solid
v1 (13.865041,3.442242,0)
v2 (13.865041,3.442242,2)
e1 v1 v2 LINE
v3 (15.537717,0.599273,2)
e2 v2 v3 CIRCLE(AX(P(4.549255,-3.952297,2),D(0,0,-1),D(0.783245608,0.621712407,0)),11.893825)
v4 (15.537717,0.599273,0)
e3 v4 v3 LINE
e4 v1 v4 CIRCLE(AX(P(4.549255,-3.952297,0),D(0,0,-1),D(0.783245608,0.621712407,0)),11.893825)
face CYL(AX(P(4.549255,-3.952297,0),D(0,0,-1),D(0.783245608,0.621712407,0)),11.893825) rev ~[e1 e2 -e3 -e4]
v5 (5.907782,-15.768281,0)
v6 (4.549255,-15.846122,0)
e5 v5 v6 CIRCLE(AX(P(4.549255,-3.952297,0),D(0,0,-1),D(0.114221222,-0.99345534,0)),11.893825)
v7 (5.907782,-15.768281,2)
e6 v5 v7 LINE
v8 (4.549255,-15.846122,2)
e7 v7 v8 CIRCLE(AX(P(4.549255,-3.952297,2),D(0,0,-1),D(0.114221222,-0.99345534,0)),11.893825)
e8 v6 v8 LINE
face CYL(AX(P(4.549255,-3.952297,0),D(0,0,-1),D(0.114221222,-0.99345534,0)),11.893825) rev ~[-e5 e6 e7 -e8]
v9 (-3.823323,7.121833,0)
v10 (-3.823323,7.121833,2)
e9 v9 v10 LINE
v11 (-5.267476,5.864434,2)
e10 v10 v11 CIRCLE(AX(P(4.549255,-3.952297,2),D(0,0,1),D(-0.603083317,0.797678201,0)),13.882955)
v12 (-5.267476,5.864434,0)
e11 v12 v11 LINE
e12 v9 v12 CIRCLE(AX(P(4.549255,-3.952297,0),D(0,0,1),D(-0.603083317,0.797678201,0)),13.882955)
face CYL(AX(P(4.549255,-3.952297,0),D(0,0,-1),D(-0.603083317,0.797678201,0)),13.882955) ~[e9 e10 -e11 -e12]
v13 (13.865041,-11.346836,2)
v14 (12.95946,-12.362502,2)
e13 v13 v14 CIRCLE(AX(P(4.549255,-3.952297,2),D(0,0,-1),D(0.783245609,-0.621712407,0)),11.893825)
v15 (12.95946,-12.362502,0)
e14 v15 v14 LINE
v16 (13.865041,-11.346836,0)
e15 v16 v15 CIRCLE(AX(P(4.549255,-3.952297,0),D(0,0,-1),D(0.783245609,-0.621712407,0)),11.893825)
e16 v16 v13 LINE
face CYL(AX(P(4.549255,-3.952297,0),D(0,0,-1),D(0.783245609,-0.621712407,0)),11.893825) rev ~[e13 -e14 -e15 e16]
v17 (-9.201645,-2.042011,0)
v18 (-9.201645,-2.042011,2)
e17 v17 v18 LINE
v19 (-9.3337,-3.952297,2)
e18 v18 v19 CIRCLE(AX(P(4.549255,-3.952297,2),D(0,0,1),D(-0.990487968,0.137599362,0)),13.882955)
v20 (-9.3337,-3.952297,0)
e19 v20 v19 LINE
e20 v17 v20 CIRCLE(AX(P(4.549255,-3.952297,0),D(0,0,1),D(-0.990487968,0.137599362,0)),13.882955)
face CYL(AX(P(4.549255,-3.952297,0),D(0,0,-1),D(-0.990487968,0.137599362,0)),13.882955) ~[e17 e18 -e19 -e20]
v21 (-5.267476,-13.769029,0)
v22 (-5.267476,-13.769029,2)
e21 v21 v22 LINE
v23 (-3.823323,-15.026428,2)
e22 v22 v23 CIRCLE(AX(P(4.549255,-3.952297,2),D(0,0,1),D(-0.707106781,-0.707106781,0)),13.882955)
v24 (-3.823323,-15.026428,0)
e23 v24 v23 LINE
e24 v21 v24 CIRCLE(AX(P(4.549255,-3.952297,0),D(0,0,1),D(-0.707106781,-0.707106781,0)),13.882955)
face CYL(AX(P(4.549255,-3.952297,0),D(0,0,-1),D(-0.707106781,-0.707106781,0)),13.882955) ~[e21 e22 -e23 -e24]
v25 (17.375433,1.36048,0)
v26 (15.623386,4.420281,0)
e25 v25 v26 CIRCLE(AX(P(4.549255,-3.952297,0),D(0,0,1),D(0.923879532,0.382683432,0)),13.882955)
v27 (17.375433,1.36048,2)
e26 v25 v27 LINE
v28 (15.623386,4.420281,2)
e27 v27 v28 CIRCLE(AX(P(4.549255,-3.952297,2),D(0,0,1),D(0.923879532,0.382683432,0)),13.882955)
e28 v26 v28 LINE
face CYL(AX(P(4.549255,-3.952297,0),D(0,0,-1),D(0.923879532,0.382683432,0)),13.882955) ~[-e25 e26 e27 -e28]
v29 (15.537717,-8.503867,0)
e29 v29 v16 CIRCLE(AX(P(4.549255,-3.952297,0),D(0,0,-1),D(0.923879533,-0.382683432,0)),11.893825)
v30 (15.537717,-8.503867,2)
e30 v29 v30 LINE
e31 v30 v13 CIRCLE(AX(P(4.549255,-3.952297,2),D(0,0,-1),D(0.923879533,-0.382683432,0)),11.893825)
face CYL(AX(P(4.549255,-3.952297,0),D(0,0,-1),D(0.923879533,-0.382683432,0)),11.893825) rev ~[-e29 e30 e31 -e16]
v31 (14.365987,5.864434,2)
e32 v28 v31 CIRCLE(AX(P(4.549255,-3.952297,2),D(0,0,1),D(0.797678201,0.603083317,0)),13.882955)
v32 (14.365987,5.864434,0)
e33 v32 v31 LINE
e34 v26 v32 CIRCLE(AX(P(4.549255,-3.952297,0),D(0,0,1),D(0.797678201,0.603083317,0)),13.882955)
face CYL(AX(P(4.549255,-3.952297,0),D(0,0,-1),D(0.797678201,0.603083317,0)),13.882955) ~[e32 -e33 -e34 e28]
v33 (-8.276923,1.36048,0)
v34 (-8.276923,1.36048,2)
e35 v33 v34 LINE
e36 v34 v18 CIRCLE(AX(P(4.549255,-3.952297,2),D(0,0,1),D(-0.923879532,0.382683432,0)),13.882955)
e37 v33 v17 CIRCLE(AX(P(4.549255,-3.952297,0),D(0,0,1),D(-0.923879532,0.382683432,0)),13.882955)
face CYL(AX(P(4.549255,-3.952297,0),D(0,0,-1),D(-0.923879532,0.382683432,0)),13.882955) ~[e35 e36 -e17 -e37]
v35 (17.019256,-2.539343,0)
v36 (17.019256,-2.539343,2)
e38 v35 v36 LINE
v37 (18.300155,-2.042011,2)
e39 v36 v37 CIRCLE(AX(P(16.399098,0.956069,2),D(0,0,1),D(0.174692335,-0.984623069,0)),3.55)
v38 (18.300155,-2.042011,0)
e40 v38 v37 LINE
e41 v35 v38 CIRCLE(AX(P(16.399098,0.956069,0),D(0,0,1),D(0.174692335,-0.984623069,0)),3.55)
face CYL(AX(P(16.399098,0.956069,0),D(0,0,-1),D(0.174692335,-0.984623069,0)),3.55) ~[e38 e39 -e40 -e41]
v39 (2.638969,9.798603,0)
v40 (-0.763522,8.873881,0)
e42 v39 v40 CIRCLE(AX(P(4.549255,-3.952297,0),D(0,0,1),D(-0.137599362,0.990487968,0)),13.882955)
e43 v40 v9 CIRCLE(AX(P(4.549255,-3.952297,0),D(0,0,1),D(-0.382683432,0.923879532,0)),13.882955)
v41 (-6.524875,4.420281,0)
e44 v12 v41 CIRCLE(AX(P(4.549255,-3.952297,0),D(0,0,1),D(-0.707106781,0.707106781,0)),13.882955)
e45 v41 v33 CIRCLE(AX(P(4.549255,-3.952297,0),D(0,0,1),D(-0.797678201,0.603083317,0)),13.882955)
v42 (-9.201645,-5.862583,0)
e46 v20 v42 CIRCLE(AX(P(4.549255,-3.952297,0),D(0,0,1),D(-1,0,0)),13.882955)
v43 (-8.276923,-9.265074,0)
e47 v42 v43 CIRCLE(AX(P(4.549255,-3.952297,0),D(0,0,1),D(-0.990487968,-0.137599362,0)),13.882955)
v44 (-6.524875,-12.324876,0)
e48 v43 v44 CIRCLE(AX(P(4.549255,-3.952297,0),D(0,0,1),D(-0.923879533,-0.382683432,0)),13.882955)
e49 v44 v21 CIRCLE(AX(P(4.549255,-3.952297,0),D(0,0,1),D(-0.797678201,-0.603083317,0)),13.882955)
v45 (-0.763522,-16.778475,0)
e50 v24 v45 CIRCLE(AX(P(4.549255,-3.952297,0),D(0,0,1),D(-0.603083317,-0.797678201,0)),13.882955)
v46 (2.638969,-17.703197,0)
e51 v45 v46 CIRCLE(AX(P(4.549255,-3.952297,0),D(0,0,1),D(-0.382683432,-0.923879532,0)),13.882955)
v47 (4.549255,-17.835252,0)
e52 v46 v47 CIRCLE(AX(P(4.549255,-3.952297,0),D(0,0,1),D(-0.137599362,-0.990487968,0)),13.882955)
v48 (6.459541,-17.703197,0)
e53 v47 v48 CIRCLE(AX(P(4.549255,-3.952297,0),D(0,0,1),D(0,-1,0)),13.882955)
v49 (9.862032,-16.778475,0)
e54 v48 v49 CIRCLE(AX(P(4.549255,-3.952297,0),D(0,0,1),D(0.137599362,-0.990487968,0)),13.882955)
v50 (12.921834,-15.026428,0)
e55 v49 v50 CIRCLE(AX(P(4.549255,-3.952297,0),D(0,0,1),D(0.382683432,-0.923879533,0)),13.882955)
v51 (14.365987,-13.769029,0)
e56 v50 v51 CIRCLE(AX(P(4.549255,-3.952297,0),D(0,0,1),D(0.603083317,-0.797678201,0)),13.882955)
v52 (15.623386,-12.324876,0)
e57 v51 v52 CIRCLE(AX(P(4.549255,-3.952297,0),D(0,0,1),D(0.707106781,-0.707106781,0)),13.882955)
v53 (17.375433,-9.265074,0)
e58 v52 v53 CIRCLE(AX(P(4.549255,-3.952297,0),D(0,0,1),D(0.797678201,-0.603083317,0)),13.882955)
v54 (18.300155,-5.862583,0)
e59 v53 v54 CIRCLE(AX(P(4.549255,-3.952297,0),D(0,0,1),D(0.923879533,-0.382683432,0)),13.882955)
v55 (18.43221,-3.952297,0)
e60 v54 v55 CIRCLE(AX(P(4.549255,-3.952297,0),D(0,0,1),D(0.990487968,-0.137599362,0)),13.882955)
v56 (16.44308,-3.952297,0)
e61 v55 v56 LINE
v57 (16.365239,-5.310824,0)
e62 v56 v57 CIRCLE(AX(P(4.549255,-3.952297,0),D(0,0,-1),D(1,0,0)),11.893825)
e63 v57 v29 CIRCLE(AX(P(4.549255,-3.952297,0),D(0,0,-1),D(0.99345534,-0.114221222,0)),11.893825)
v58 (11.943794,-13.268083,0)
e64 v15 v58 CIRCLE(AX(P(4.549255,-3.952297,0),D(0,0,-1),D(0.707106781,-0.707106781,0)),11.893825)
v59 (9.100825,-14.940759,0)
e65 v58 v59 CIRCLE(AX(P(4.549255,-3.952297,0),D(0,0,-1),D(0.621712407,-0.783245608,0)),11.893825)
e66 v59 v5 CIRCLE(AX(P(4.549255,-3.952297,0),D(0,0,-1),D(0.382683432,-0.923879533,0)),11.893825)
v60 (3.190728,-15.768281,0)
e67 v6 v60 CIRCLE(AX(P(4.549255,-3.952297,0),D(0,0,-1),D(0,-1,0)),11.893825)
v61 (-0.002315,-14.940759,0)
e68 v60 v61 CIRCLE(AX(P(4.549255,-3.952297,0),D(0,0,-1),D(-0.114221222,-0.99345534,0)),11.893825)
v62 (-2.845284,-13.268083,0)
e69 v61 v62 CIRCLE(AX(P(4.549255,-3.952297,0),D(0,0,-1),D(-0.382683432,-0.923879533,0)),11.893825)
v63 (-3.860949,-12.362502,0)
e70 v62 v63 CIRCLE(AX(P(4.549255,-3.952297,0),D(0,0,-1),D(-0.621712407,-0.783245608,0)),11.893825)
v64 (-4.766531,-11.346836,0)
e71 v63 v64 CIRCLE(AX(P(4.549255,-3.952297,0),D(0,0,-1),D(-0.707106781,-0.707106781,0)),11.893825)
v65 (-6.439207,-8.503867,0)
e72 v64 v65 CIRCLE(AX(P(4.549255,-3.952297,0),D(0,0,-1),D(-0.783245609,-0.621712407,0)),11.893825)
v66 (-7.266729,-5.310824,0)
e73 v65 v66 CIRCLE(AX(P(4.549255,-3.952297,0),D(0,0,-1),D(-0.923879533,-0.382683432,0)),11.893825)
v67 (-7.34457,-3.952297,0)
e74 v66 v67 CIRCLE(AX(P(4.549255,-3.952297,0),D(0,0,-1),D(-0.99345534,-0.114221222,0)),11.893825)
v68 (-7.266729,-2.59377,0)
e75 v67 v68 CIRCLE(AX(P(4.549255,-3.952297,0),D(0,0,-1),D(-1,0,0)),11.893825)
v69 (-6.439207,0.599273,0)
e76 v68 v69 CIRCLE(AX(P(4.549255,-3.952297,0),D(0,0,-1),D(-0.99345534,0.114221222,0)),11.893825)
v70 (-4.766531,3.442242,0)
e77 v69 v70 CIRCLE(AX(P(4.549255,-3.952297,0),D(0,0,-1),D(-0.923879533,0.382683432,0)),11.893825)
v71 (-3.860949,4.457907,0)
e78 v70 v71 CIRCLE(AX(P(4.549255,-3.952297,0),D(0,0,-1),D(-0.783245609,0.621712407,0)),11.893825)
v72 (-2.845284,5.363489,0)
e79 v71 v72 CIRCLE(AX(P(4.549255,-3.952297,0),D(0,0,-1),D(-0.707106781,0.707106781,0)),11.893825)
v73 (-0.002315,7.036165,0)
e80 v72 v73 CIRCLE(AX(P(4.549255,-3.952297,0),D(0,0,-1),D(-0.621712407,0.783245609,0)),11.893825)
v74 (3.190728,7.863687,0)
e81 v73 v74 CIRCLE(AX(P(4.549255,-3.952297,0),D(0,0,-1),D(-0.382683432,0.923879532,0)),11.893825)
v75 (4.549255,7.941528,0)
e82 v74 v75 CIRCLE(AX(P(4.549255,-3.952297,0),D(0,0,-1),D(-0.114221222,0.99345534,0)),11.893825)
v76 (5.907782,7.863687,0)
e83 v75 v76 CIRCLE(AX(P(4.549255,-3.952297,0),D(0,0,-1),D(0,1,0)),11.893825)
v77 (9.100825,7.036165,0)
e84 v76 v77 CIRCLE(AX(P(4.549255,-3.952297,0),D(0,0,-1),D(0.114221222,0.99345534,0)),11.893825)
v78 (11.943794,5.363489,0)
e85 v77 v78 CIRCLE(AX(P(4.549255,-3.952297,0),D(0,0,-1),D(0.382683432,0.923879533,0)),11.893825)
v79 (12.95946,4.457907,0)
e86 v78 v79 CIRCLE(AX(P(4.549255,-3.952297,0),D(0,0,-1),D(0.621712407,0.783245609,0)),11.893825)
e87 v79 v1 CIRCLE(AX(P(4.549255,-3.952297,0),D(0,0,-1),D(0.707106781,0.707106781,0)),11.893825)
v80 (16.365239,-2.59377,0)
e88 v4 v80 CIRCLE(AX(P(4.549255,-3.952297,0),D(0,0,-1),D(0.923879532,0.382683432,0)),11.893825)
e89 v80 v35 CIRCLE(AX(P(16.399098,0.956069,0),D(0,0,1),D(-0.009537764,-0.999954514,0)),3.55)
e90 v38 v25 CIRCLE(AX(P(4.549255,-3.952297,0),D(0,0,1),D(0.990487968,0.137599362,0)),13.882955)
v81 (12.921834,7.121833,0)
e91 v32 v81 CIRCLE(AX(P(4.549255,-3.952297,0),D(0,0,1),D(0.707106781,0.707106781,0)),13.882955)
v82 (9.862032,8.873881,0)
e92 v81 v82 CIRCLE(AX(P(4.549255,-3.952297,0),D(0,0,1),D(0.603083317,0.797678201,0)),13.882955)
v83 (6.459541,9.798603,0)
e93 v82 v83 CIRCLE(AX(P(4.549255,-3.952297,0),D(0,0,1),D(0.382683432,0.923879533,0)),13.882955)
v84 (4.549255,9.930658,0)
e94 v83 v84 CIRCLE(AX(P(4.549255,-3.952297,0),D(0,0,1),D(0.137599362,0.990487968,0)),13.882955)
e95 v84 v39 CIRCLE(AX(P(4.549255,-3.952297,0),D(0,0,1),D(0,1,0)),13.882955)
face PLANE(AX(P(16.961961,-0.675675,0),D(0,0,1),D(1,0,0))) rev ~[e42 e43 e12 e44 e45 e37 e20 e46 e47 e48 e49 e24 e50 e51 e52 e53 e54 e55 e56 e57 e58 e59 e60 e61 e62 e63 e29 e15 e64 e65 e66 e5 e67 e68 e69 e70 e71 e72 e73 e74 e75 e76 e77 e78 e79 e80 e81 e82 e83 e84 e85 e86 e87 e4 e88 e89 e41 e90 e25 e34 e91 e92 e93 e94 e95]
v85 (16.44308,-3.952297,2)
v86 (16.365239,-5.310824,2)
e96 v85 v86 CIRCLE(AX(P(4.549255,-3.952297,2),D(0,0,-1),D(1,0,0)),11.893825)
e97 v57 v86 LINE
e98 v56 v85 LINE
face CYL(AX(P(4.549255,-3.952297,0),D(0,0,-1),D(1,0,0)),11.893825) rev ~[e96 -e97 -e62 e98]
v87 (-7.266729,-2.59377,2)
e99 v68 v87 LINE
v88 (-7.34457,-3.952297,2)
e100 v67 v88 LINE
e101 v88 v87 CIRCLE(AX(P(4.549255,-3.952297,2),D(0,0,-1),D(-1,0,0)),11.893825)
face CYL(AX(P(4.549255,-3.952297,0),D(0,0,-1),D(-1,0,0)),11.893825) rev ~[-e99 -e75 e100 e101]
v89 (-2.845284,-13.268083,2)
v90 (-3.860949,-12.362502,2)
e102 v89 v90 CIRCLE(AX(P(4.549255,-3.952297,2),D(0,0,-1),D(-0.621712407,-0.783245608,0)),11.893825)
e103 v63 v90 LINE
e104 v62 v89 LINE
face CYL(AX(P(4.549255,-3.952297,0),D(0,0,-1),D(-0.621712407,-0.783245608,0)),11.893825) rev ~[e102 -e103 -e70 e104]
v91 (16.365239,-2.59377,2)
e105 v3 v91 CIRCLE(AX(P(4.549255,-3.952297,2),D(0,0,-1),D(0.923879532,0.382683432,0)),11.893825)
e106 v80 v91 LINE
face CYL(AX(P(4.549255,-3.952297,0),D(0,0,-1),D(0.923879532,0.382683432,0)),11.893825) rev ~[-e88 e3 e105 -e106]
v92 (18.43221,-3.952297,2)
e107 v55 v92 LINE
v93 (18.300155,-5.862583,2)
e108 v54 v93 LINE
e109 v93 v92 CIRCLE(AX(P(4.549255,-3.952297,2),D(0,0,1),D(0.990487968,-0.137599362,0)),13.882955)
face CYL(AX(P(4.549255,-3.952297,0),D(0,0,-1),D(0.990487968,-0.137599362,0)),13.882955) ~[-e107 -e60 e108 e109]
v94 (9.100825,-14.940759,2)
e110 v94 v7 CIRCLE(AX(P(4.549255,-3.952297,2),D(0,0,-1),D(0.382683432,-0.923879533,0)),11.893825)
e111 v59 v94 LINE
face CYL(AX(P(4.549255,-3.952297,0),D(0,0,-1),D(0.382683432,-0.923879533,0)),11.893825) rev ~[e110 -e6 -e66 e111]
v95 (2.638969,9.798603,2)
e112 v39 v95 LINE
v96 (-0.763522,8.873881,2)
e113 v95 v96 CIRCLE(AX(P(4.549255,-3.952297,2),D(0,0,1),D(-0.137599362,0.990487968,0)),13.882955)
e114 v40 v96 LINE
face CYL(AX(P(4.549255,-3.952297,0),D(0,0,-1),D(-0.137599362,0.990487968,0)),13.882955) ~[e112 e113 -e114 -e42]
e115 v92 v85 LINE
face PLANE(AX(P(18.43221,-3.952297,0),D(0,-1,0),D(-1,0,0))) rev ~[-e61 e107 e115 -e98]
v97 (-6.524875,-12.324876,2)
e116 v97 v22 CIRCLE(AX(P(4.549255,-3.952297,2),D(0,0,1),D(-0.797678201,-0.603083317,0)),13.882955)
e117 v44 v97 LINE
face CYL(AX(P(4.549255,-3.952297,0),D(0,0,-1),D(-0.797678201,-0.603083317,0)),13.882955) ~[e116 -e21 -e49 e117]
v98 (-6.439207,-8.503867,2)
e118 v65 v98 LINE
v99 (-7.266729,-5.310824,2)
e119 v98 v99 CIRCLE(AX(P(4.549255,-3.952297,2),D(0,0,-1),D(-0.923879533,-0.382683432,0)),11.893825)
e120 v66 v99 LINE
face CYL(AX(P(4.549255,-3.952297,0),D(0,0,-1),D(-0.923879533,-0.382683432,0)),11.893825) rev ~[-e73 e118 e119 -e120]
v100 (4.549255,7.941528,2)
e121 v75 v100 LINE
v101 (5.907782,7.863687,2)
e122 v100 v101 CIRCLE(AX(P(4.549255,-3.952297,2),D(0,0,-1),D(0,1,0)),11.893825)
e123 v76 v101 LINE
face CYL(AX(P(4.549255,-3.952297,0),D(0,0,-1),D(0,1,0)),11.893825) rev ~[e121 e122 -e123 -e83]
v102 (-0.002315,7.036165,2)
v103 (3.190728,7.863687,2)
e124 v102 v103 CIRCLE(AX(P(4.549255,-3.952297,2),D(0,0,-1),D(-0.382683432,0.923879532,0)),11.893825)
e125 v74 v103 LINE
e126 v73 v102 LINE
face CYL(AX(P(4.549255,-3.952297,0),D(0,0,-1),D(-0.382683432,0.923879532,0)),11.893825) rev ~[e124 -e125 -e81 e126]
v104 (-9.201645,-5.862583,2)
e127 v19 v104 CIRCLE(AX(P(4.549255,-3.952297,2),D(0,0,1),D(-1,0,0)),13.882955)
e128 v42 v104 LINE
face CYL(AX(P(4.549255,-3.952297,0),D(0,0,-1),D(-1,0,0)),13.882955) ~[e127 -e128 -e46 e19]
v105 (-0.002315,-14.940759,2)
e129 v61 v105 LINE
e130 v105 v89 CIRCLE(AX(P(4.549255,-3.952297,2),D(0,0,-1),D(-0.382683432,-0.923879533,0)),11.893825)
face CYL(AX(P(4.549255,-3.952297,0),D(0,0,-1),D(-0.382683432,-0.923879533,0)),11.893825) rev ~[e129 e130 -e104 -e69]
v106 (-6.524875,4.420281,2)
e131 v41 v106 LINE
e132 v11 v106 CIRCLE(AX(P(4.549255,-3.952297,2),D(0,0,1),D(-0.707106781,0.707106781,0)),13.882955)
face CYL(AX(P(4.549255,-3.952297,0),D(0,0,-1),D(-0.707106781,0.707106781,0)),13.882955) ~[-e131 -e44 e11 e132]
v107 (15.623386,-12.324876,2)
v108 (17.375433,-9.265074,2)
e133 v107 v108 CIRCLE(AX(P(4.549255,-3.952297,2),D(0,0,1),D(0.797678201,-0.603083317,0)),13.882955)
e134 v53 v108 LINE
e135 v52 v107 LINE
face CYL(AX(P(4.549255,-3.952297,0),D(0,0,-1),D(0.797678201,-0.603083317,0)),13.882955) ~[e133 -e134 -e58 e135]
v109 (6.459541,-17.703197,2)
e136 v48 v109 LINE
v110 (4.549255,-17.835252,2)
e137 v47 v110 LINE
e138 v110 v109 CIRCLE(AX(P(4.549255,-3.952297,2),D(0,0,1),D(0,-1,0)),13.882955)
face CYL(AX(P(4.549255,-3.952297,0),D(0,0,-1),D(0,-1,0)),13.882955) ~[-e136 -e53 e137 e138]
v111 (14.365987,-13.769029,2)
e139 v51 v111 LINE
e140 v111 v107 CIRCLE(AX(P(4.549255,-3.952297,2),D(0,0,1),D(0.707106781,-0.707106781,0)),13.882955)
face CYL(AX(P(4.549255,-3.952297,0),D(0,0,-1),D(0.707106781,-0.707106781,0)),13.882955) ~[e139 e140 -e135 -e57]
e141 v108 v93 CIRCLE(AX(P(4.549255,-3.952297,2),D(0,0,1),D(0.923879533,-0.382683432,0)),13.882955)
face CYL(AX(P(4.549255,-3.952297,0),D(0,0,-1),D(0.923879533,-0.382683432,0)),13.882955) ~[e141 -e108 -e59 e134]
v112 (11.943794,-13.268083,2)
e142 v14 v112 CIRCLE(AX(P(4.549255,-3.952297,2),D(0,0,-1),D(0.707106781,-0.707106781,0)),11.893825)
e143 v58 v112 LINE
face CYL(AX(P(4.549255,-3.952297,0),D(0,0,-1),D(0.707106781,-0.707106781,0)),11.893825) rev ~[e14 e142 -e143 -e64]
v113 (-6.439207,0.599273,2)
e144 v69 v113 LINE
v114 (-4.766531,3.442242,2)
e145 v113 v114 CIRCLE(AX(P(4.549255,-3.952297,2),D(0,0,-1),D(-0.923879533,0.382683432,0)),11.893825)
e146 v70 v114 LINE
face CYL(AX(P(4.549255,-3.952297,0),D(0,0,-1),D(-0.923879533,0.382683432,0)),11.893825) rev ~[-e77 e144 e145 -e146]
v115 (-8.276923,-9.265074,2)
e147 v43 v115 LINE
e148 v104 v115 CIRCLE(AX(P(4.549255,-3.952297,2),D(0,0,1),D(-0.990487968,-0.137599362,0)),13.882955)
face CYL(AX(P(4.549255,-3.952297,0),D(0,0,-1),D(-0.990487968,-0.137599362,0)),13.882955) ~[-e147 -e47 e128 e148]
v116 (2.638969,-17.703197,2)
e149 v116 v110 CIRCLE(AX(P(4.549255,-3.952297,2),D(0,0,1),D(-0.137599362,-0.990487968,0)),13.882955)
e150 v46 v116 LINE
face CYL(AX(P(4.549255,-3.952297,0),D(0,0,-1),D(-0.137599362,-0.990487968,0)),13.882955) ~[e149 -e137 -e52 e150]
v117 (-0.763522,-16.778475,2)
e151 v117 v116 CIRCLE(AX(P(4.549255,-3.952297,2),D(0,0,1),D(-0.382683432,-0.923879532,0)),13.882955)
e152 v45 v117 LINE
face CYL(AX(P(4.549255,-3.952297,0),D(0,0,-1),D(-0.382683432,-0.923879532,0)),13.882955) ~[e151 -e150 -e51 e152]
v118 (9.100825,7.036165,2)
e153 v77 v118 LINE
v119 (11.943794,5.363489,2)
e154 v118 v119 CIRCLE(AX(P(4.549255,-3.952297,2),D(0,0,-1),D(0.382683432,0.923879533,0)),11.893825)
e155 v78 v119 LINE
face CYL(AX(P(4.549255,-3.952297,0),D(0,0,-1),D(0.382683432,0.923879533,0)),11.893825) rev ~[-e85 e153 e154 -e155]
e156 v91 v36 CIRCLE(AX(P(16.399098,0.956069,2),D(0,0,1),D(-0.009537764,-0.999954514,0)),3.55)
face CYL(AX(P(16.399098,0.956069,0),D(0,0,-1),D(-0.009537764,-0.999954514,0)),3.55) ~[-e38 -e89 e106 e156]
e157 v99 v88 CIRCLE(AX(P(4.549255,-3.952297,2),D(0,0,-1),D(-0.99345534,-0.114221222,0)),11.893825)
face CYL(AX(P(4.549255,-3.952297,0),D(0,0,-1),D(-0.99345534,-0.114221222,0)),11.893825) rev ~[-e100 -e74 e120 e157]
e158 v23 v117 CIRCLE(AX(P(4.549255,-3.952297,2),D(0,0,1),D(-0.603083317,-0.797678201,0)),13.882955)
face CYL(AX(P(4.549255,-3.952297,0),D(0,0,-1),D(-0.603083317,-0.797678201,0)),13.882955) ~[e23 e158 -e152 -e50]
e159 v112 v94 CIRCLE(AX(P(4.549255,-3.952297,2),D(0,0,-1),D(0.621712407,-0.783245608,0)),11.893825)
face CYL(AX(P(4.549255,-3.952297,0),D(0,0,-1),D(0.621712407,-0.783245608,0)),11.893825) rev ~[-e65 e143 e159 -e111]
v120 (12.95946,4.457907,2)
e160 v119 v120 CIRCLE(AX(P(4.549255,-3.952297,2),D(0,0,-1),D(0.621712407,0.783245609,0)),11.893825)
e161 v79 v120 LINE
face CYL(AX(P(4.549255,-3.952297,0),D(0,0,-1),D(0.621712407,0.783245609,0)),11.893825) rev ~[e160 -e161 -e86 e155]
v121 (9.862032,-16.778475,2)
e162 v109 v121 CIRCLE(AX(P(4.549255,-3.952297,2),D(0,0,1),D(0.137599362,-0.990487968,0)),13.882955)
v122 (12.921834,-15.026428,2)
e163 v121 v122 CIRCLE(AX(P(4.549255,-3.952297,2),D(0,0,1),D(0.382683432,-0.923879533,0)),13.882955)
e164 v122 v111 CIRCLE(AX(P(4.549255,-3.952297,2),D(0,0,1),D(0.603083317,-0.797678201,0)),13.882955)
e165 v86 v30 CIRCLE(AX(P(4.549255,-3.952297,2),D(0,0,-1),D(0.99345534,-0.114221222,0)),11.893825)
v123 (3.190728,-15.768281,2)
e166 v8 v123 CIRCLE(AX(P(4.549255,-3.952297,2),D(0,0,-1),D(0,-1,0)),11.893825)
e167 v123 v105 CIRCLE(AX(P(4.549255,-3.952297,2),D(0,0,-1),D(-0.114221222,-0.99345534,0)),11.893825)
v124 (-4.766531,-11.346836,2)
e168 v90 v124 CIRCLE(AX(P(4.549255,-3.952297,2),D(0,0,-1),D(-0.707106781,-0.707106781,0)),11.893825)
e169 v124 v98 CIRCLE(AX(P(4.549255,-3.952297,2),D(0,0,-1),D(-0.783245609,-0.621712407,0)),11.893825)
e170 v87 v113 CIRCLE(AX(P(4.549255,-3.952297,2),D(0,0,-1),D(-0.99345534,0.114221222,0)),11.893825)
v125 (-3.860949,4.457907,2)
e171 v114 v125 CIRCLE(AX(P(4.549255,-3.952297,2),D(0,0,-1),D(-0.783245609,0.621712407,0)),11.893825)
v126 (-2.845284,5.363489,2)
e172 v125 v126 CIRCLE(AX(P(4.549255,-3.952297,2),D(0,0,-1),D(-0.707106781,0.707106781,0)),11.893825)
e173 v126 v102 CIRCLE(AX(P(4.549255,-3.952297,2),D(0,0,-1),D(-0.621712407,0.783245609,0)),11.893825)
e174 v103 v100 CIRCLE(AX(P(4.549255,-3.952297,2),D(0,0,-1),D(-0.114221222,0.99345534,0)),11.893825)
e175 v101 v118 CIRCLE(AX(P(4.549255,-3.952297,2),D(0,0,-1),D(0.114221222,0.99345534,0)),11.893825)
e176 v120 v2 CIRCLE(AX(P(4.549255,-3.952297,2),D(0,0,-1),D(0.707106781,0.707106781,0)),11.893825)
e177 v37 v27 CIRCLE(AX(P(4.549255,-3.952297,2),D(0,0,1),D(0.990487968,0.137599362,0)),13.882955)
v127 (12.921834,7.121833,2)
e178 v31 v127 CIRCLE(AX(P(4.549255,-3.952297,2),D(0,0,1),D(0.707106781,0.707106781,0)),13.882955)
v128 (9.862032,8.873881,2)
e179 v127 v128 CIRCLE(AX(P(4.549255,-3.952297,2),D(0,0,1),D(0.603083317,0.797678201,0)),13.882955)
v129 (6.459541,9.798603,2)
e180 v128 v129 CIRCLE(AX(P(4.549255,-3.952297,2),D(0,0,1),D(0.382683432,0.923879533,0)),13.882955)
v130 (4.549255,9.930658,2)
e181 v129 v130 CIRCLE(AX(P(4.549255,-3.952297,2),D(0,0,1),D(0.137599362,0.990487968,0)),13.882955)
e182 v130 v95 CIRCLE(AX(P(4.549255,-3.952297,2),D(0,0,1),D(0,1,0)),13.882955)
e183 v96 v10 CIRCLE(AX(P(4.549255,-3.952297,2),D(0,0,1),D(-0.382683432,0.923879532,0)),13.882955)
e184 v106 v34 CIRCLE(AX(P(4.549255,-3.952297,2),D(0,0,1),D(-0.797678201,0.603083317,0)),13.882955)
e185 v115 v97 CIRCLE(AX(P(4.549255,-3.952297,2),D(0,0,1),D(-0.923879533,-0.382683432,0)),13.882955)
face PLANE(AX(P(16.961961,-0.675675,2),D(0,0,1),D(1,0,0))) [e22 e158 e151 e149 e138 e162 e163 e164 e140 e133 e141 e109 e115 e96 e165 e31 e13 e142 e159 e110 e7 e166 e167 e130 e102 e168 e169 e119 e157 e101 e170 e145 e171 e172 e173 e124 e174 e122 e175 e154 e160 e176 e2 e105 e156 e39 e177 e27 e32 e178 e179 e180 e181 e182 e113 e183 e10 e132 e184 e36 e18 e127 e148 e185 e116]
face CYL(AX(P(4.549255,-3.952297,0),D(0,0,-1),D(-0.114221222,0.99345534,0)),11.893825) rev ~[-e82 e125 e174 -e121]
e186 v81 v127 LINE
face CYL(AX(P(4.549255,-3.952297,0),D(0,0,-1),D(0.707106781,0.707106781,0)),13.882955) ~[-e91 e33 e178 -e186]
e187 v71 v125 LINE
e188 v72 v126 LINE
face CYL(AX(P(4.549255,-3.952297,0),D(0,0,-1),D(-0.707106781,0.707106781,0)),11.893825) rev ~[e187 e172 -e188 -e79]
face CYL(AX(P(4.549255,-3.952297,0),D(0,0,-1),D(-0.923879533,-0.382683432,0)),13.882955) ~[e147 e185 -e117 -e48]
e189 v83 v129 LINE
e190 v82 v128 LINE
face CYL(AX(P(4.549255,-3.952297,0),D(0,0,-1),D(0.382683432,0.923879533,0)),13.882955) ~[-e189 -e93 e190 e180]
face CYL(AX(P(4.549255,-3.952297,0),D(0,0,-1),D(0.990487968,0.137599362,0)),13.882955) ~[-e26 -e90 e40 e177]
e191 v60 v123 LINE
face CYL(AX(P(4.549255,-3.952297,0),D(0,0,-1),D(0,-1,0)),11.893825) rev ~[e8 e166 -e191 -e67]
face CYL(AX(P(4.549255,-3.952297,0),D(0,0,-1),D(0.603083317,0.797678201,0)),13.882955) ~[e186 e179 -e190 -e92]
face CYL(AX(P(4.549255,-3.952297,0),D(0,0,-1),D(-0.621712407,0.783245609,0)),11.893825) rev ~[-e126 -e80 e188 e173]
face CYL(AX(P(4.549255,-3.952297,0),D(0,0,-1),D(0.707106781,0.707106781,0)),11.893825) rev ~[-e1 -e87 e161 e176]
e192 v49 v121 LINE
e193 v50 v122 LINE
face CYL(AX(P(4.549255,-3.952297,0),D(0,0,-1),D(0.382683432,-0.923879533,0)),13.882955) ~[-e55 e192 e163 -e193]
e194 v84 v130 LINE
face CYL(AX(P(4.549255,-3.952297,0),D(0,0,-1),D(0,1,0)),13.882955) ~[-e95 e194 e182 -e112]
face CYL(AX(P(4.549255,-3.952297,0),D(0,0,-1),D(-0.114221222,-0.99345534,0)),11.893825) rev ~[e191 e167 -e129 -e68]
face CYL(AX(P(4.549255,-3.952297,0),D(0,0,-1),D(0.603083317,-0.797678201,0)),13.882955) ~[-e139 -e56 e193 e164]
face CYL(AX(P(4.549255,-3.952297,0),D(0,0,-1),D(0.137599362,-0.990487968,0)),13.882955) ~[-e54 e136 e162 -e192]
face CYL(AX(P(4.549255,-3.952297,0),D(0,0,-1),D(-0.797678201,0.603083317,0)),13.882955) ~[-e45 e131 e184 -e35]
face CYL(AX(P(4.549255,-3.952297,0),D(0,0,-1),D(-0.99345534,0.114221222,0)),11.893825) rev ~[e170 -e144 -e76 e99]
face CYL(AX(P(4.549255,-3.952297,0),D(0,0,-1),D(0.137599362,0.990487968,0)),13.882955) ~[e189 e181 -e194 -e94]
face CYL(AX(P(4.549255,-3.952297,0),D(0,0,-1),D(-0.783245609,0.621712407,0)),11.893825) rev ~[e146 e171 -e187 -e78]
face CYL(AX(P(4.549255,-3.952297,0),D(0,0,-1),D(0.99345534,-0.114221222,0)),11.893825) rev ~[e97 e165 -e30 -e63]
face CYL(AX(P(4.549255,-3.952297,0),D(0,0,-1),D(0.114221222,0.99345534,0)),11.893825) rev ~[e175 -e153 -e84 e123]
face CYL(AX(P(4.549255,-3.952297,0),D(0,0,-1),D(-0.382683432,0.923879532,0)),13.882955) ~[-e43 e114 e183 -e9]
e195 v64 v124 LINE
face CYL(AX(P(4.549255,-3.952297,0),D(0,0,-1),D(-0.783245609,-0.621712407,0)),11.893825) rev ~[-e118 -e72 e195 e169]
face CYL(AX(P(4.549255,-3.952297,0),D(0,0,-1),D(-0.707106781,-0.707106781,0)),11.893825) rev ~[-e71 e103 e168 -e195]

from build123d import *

# Parameters (mm, degrees)
F2_DEPTH = 2


with BuildPart() as f2:
    # F1 (on face) → F2 (new body)
    with BuildSketch(Plane.XY):
        with BuildLine():
            ThreePointArc((18.3001549066, -2.0420113713), (17.9462510765, -0.3112895728), (17.3754329945, 1.3604797241))
            Line((17.3754329945, 1.3604797241), (15.5377167825, 0.5992727453))
            ThreePointArc((15.5377167825, 0.5992727453), (16.0627067105, -0.968422059), (16.3652392751, -2.593769859))
            ThreePointArc((16.3652392751, -2.593769859), (16.6935081093, -2.5817022248), (17.0192561264, -2.5393432276))
            ThreePointArc((17.0192561264, -2.5393432276), (17.6839972454, -2.3532416527), (18.3001549066, -2.0420113713))
        make_face()
        with BuildLine():
            Line((15.5377167825, 0.5992727453), (17.3754329945, 1.3604797241))
            ThreePointArc((17.3754329945, 1.3604797241), (16.5969429247, 2.9462284671), (15.6233856027, 4.4202813853))
            ThreePointArc((15.6233856027, 4.4202813853), (14.6734726061, 4.0584412817), (13.8650414705, 3.4422415894))
            ThreePointArc((13.8650414705, 3.4422415894), (14.8004130937, 2.0790243103), (15.5377167825, 0.5992727453))
        make_face()
        with BuildLine():
            ThreePointArc((13.8650414705, 3.4422415894), (14.6734726061, 4.0584412817), (15.6233856027, 4.4202813853))
            ThreePointArc((15.6233856027, 4.4202813853), (15.0196144043, 5.16406253), (14.3659866612, 5.8644344489))
            Line((14.3659866612, 5.8644344489), (12.9594595658, 4.4579073535))
            ThreePointArc((12.9594595658, 4.4579073535), (13.4267875285, 3.9630358747), (13.8650414705, 3.4422415894))
        make_face()
        with BuildLine():
            ThreePointArc((18.3001549066, -5.8625828565), (18.399156889, -4.9097194566), (18.4322100127, -3.9522971139))
            Line((18.4322100127, -3.9522971139), (16.4430803185, -3.9522971139))
            ThreePointArc((16.4430803185, -3.9522971139), (16.4236041115, -4.6326748639), (16.3652392751, -5.3108243689))
            ThreePointArc((16.3652392751, -5.3108243689), (17.3726053942, -5.446752526), (18.3001549066, -5.8625828565))
        make_face()
        with BuildLine():
            Line((12.9594595658, 4.4579073535), (14.3659866612, 5.8644344489))
            ThreePointArc((14.3659866612, 5.8644344489), (13.6656147423, 6.518062192), (12.9218335976, 7.1218333904))
            ThreePointArc((12.9218335976, 7.1218333904), (12.559993494, 6.1719203938), (11.9437938017, 5.3634892582))
            ThreePointArc((11.9437938017, 5.3634892582), (12.464588087, 4.9252353162), (12.9594595658, 4.4579073535))
        make_face()
        with BuildLine():
            ThreePointArc((17.3754329945, -9.2650739519), (17.9462510765, -7.593304655), (18.3001549066, -5.8625828565))
            ThreePointArc((18.3001549066, -5.8625828565), (17.3726053942, -5.446752526), (16.3652392751, -5.3108243689))
            ThreePointArc((16.3652392751, -5.3108243689), (16.0627067105, -6.9361721689), (15.5377167825, -8.5038669731))
            Line((15.5377167825, -8.5038669731), (17.3754329945, -9.2650739519))
        make_face()
        with BuildLine():
            ThreePointArc((11.9437938017, 5.3634892582), (12.559993494, 6.1719203938), (12.9218335976, 7.1218333904))
            ThreePointArc((12.9218335976, 7.1218333904), (11.4477806794, 8.0953907124), (9.8620319364, 8.8738807822))
            Line((9.8620319364, 8.8738807822), (9.1008249576, 7.0361645702))
            ThreePointArc((9.1008249576, 7.0361645702), (10.5805765226, 6.2988608814), (11.9437938017, 5.3634892582))
        make_face()
        with BuildLine():
            ThreePointArc((15.6233856027, -12.3248756131), (16.5969429247, -10.8508226949), (17.3754329945, -9.2650739519))
            Line((17.3754329945, -9.2650739519), (15.5377167825, -8.5038669731))
            ThreePointArc((15.5377167825, -8.5038669731), (14.8004130937, -9.9836185381), (13.8650414705, -11.3468358173))
            ThreePointArc((13.8650414705, -11.3468358173), (14.6734726061, -11.9630355095), (15.6233856027, -12.3248756131))
        make_face()
        with BuildLine():
            Line((9.1008249576, 7.0361645702), (9.8620319364, 8.8738807822))
            ThreePointArc((9.8620319364, 8.8738807822), (8.1902626395, 9.4446988642), (6.459540841, 9.7986026942))
            ThreePointArc((6.459540841, 9.7986026942), (6.0437105105, 8.8710531819), (5.9077823533, 7.8636870628))
            ThreePointArc((5.9077823533, 7.8636870628), (7.5331301533, 7.5611544982), (9.1008249576, 7.0361645702))
        make_face()
        with BuildLine():
            ThreePointArc((14.3659866612, -13.7690286767), (15.0196144043, -13.0686567579), (15.6233856027, -12.3248756131))
            ThreePointArc((15.6233856027, -12.3248756131), (14.6734726061, -11.9630355095), (13.8650414705, -11.3468358173))
            ThreePointArc((13.8650414705, -11.3468358173), (13.4267875285, -11.8676301025), (12.9594595658, -12.3625015813))
            Line((12.9594595658, -12.3625015813), (14.3659866612, -13.7690286767))
        make_face()
        with BuildLine():
            ThreePointArc((5.9077823533, 7.8636870628), (6.0437105105, 8.8710531819), (6.459540841, 9.7986026942))
            ThreePointArc((6.459540841, 9.7986026942), (5.5066774411, 9.8976046767), (4.5492550984, 9.9306578004))
            Line((4.5492550984, 9.9306578004), (4.5492550984, 7.9415281062))
            ThreePointArc((4.5492550984, 7.9415281062), (5.2296328483, 7.9220518992), (5.9077823533, 7.8636870628))
        make_face()
        with BuildLine():
            ThreePointArc((12.9218335976, -15.0264276183), (13.6656147423, -14.4226564199), (14.3659866612, -13.7690286767))
            Line((14.3659866612, -13.7690286767), (12.9594595658, -12.3625015813))
            ThreePointArc((12.9594595658, -12.3625015813), (12.464588087, -12.829829544), (11.9437938017, -13.2680834861))
            ThreePointArc((11.9437938017, -13.2680834861), (12.559993494, -14.0765146217), (12.9218335976, -15.0264276183))
        make_face()
        with BuildLine():
            Line((4.5492550984, 7.9415281062), (4.5492550984, 9.9306578004))
            ThreePointArc((4.5492550984, 9.9306578004), (3.5918327557, 9.8976046767), (2.6389693558, 9.7986026942))
            ThreePointArc((2.6389693558, 9.7986026942), (3.0547996863, 8.8710531819), (3.1907278434, 7.8636870628))
            ThreePointArc((3.1907278434, 7.8636870628), (3.8688773484, 7.9220518992), (4.5492550984, 7.9415281062))
        make_face()
        with BuildLine():
            ThreePointArc((9.8620319364, -16.77847501), (11.4477806794, -15.9999849403), (12.9218335976, -15.0264276183))
            ThreePointArc((12.9218335976, -15.0264276183), (12.559993494, -14.0765146217), (11.9437938017, -13.2680834861))
            ThreePointArc((11.9437938017, -13.2680834861), (10.5805765226, -14.2034551093), (9.1008249576, -14.9407587981))
            Line((9.1008249576, -14.9407587981), (9.8620319364, -16.77847501))
        make_face()
        with BuildLine():
            ThreePointArc((3.1907278434, 7.8636870628), (3.0547996863, 8.8710531819), (2.6389693558, 9.7986026942))
            ThreePointArc((2.6389693558, 9.7986026942), (0.9082475573, 9.4446988642), (-0.7635217396, 8.8738807822))
            Line((-0.7635217396, 8.8738807822), (-0.0023147608, 7.0361645702))
            ThreePointArc((-0.0023147608, 7.0361645702), (1.5653800434, 7.5611544982), (3.1907278434, 7.8636870628))
        make_face()
        with BuildLine():
            ThreePointArc((6.459540841, -17.7031969221), (8.1902626395, -17.3492930921), (9.8620319364, -16.77847501))
            Line((9.8620319364, -16.77847501), (9.1008249576, -14.9407587981))
            ThreePointArc((9.1008249576, -14.9407587981), (7.5331301533, -15.465748726), (5.9077823533, -15.7682812907))
            ThreePointArc((5.9077823533, -15.7682812907), (6.0437105105, -16.7756474097), (6.459540841, -17.7031969221))
        make_face()
        with BuildLine():
            Line((-0.0023147608, 7.0361645702), (-0.7635217396, 8.8738807822))
            ThreePointArc((-0.7635217396, 8.8738807822), (-2.3492704826, 8.0953907124), (-3.8233234008, 7.1218333904))
            ThreePointArc((-3.8233234008, 7.1218333904), (-3.4614832972, 6.1719203938), (-2.845283605, 5.3634892582))
            ThreePointArc((-2.845283605, 5.3634892582), (-1.4820663258, 6.2988608814), (-0.0023147608, 7.0361645702))
        make_face()
        with BuildLine():
            ThreePointArc((4.5492550984, -17.8352520282), (5.5066774411, -17.8021989046), (6.459540841, -17.7031969221))
            ThreePointArc((6.459540841, -17.7031969221), (6.0437105105, -16.7756474097), (5.9077823533, -15.7682812907))
            ThreePointArc((5.9077823533, -15.7682812907), (5.2296328483, -15.826646127), (4.5492550984, -15.8461223341))
            Line((4.5492550984, -15.8461223341), (4.5492550984, -17.8352520282))
        make_face()
        with BuildLine():
            ThreePointArc((-2.845283605, 5.3634892582), (-3.4614832972, 6.1719203938), (-3.8233234008, 7.1218333904))
            ThreePointArc((-3.8233234008, 7.1218333904), (-4.5671045455, 6.518062192), (-5.2674764644, 5.8644344489))
            Line((-5.2674764644, 5.8644344489), (-3.860949369, 4.4579073535))
            ThreePointArc((-3.860949369, 4.4579073535), (-3.3660778902, 4.9252353162), (-2.845283605, 5.3634892582))
        make_face()
        with BuildLine():
            ThreePointArc((2.6389693558, -17.7031969221), (3.5918327557, -17.8021989046), (4.5492550984, -17.8352520282))
            Line((4.5492550984, -17.8352520282), (4.5492550984, -15.8461223341))
            ThreePointArc((4.5492550984, -15.8461223341), (3.8688773484, -15.826646127), (3.1907278434, -15.7682812907))
            ThreePointArc((3.1907278434, -15.7682812907), (3.0547996863, -16.7756474097), (2.6389693558, -17.7031969221))
        make_face()
        with BuildLine():
            Line((-3.860949369, 4.4579073535), (-5.2674764644, 5.8644344489))
            ThreePointArc((-5.2674764644, 5.8644344489), (-5.9211042076, 5.16406253), (-6.524875406, 4.4202813853))
            ThreePointArc((-6.524875406, 4.4202813853), (-5.5749624094, 4.0584412817), (-4.7665312738, 3.4422415894))
            ThreePointArc((-4.7665312738, 3.4422415894), (-4.3282773317, 3.9630358747), (-3.860949369, 4.4579073535))
        make_face()
        with BuildLine():
            ThreePointArc((-0.7635217396, -16.77847501), (0.9082475573, -17.3492930921), (2.6389693558, -17.7031969221))
            ThreePointArc((2.6389693558, -17.7031969221), (3.0547996863, -16.7756474097), (3.1907278434, -15.7682812907))
            ThreePointArc((3.1907278434, -15.7682812907), (1.5653800434, -15.465748726), (-0.0023147608, -14.9407587981))
            Line((-0.0023147608, -14.9407587981), (-0.7635217396, -16.77847501))
        make_face()
        with BuildLine():
            ThreePointArc((-4.7665312738, 3.4422415894), (-5.5749624094, 4.0584412817), (-6.524875406, 4.4202813853))
            ThreePointArc((-6.524875406, 4.4202813853), (-7.498432728, 2.9462284671), (-8.2769227977, 1.3604797241))
            Line((-8.2769227977, 1.3604797241), (-6.4392065858, 0.5992727453))
            ThreePointArc((-6.4392065858, 0.5992727453), (-5.701902897, 2.0790243103), (-4.7665312738, 3.4422415894))
        make_face()
        with BuildLine():
            ThreePointArc((-3.8233234008, -15.0264276183), (-2.3492704826, -15.9999849403), (-0.7635217396, -16.77847501))
            Line((-0.7635217396, -16.77847501), (-0.0023147608, -14.9407587981))
            ThreePointArc((-0.0023147608, -14.9407587981), (-1.4820663258, -14.2034551093), (-2.845283605, -13.2680834861))
            ThreePointArc((-2.845283605, -13.2680834861), (-3.4614832972, -14.0765146217), (-3.8233234008, -15.0264276183))
        make_face()
        with BuildLine():
            Line((-6.4392065858, 0.5992727453), (-8.2769227977, 1.3604797241))
            ThreePointArc((-8.2769227977, 1.3604797241), (-8.8477408798, -0.3112895728), (-9.2016447098, -2.0420113713))
            ThreePointArc((-9.2016447098, -2.0420113713), (-8.2740951974, -2.4578417018), (-7.2667290784, -2.593769859))
            ThreePointArc((-7.2667290784, -2.593769859), (-6.9641965137, -0.968422059), (-6.4392065858, 0.5992727453))
        make_face()
        with BuildLine():
            ThreePointArc((-5.2674764644, -13.7690286767), (-4.5671045455, -14.4226564199), (-3.8233234008, -15.0264276183))
            ThreePointArc((-3.8233234008, -15.0264276183), (-3.4614832972, -14.0765146217), (-2.845283605, -13.2680834861))
            ThreePointArc((-2.845283605, -13.2680834861), (-3.3660778902, -12.829829544), (-3.860949369, -12.3625015813))
            Line((-3.860949369, -12.3625015813), (-5.2674764644, -13.7690286767))
        make_face()
        with BuildLine():
            ThreePointArc((-7.2667290784, -2.593769859), (-8.2740951974, -2.4578417018), (-9.2016447098, -2.0420113713))
            ThreePointArc((-9.2016447098, -2.0420113713), (-9.3006466923, -2.9948747712), (-9.3336998159, -3.9522971139))
            Line((-9.3336998159, -3.9522971139), (-7.3445701218, -3.9522971139))
            ThreePointArc((-7.3445701218, -3.9522971139), (-7.3250939147, -3.271919364), (-7.2667290784, -2.593769859))
        make_face()
        with BuildLine():
            ThreePointArc((-6.524875406, -12.3248756131), (-5.9211042076, -13.0686567579), (-5.2674764644, -13.7690286767))
            Line((-5.2674764644, -13.7690286767), (-3.860949369, -12.3625015813))
            ThreePointArc((-3.860949369, -12.3625015813), (-4.3282773317, -11.8676301025), (-4.7665312738, -11.3468358173))
            ThreePointArc((-4.7665312738, -11.3468358173), (-5.5749624094, -11.9630355095), (-6.524875406, -12.3248756131))
        make_face()
        with BuildLine():
            Line((-7.3445701218, -3.9522971139), (-9.3336998159, -3.9522971139))
            ThreePointArc((-9.3336998159, -3.9522971139), (-9.3006466923, -4.9097194566), (-9.2016447098, -5.8625828565))
            ThreePointArc((-9.2016447098, -5.8625828565), (-8.2740951974, -5.446752526), (-7.2667290784, -5.3108243689))
            ThreePointArc((-7.2667290784, -5.3108243689), (-7.3250939147, -4.6326748639), (-7.3445701218, -3.9522971139))
        make_face()
        with BuildLine():
            ThreePointArc((-8.2769227977, -9.2650739519), (-7.498432728, -10.8508226949), (-6.524875406, -12.3248756131))
            ThreePointArc((-6.524875406, -12.3248756131), (-5.5749624094, -11.9630355095), (-4.7665312738, -11.3468358173))
            ThreePointArc((-4.7665312738, -11.3468358173), (-5.701902897, -9.9836185381), (-6.4392065858, -8.5038669731))
            Line((-6.4392065858, -8.5038669731), (-8.2769227977, -9.2650739519))
        make_face()
        with BuildLine():
            ThreePointArc((-7.2667290784, -5.3108243689), (-8.2740951974, -5.446752526), (-9.2016447098, -5.8625828565))
            ThreePointArc((-9.2016447098, -5.8625828565), (-8.8477408798, -7.593304655), (-8.2769227977, -9.2650739519))
            Line((-8.2769227977, -9.2650739519), (-6.4392065858, -8.5038669731))
            ThreePointArc((-6.4392065858, -8.5038669731), (-6.9641965137, -6.9361721689), (-7.2667290784, -5.3108243689))
        make_face()
    extrude(amount=F2_DEPTH)


solid = f2.part
